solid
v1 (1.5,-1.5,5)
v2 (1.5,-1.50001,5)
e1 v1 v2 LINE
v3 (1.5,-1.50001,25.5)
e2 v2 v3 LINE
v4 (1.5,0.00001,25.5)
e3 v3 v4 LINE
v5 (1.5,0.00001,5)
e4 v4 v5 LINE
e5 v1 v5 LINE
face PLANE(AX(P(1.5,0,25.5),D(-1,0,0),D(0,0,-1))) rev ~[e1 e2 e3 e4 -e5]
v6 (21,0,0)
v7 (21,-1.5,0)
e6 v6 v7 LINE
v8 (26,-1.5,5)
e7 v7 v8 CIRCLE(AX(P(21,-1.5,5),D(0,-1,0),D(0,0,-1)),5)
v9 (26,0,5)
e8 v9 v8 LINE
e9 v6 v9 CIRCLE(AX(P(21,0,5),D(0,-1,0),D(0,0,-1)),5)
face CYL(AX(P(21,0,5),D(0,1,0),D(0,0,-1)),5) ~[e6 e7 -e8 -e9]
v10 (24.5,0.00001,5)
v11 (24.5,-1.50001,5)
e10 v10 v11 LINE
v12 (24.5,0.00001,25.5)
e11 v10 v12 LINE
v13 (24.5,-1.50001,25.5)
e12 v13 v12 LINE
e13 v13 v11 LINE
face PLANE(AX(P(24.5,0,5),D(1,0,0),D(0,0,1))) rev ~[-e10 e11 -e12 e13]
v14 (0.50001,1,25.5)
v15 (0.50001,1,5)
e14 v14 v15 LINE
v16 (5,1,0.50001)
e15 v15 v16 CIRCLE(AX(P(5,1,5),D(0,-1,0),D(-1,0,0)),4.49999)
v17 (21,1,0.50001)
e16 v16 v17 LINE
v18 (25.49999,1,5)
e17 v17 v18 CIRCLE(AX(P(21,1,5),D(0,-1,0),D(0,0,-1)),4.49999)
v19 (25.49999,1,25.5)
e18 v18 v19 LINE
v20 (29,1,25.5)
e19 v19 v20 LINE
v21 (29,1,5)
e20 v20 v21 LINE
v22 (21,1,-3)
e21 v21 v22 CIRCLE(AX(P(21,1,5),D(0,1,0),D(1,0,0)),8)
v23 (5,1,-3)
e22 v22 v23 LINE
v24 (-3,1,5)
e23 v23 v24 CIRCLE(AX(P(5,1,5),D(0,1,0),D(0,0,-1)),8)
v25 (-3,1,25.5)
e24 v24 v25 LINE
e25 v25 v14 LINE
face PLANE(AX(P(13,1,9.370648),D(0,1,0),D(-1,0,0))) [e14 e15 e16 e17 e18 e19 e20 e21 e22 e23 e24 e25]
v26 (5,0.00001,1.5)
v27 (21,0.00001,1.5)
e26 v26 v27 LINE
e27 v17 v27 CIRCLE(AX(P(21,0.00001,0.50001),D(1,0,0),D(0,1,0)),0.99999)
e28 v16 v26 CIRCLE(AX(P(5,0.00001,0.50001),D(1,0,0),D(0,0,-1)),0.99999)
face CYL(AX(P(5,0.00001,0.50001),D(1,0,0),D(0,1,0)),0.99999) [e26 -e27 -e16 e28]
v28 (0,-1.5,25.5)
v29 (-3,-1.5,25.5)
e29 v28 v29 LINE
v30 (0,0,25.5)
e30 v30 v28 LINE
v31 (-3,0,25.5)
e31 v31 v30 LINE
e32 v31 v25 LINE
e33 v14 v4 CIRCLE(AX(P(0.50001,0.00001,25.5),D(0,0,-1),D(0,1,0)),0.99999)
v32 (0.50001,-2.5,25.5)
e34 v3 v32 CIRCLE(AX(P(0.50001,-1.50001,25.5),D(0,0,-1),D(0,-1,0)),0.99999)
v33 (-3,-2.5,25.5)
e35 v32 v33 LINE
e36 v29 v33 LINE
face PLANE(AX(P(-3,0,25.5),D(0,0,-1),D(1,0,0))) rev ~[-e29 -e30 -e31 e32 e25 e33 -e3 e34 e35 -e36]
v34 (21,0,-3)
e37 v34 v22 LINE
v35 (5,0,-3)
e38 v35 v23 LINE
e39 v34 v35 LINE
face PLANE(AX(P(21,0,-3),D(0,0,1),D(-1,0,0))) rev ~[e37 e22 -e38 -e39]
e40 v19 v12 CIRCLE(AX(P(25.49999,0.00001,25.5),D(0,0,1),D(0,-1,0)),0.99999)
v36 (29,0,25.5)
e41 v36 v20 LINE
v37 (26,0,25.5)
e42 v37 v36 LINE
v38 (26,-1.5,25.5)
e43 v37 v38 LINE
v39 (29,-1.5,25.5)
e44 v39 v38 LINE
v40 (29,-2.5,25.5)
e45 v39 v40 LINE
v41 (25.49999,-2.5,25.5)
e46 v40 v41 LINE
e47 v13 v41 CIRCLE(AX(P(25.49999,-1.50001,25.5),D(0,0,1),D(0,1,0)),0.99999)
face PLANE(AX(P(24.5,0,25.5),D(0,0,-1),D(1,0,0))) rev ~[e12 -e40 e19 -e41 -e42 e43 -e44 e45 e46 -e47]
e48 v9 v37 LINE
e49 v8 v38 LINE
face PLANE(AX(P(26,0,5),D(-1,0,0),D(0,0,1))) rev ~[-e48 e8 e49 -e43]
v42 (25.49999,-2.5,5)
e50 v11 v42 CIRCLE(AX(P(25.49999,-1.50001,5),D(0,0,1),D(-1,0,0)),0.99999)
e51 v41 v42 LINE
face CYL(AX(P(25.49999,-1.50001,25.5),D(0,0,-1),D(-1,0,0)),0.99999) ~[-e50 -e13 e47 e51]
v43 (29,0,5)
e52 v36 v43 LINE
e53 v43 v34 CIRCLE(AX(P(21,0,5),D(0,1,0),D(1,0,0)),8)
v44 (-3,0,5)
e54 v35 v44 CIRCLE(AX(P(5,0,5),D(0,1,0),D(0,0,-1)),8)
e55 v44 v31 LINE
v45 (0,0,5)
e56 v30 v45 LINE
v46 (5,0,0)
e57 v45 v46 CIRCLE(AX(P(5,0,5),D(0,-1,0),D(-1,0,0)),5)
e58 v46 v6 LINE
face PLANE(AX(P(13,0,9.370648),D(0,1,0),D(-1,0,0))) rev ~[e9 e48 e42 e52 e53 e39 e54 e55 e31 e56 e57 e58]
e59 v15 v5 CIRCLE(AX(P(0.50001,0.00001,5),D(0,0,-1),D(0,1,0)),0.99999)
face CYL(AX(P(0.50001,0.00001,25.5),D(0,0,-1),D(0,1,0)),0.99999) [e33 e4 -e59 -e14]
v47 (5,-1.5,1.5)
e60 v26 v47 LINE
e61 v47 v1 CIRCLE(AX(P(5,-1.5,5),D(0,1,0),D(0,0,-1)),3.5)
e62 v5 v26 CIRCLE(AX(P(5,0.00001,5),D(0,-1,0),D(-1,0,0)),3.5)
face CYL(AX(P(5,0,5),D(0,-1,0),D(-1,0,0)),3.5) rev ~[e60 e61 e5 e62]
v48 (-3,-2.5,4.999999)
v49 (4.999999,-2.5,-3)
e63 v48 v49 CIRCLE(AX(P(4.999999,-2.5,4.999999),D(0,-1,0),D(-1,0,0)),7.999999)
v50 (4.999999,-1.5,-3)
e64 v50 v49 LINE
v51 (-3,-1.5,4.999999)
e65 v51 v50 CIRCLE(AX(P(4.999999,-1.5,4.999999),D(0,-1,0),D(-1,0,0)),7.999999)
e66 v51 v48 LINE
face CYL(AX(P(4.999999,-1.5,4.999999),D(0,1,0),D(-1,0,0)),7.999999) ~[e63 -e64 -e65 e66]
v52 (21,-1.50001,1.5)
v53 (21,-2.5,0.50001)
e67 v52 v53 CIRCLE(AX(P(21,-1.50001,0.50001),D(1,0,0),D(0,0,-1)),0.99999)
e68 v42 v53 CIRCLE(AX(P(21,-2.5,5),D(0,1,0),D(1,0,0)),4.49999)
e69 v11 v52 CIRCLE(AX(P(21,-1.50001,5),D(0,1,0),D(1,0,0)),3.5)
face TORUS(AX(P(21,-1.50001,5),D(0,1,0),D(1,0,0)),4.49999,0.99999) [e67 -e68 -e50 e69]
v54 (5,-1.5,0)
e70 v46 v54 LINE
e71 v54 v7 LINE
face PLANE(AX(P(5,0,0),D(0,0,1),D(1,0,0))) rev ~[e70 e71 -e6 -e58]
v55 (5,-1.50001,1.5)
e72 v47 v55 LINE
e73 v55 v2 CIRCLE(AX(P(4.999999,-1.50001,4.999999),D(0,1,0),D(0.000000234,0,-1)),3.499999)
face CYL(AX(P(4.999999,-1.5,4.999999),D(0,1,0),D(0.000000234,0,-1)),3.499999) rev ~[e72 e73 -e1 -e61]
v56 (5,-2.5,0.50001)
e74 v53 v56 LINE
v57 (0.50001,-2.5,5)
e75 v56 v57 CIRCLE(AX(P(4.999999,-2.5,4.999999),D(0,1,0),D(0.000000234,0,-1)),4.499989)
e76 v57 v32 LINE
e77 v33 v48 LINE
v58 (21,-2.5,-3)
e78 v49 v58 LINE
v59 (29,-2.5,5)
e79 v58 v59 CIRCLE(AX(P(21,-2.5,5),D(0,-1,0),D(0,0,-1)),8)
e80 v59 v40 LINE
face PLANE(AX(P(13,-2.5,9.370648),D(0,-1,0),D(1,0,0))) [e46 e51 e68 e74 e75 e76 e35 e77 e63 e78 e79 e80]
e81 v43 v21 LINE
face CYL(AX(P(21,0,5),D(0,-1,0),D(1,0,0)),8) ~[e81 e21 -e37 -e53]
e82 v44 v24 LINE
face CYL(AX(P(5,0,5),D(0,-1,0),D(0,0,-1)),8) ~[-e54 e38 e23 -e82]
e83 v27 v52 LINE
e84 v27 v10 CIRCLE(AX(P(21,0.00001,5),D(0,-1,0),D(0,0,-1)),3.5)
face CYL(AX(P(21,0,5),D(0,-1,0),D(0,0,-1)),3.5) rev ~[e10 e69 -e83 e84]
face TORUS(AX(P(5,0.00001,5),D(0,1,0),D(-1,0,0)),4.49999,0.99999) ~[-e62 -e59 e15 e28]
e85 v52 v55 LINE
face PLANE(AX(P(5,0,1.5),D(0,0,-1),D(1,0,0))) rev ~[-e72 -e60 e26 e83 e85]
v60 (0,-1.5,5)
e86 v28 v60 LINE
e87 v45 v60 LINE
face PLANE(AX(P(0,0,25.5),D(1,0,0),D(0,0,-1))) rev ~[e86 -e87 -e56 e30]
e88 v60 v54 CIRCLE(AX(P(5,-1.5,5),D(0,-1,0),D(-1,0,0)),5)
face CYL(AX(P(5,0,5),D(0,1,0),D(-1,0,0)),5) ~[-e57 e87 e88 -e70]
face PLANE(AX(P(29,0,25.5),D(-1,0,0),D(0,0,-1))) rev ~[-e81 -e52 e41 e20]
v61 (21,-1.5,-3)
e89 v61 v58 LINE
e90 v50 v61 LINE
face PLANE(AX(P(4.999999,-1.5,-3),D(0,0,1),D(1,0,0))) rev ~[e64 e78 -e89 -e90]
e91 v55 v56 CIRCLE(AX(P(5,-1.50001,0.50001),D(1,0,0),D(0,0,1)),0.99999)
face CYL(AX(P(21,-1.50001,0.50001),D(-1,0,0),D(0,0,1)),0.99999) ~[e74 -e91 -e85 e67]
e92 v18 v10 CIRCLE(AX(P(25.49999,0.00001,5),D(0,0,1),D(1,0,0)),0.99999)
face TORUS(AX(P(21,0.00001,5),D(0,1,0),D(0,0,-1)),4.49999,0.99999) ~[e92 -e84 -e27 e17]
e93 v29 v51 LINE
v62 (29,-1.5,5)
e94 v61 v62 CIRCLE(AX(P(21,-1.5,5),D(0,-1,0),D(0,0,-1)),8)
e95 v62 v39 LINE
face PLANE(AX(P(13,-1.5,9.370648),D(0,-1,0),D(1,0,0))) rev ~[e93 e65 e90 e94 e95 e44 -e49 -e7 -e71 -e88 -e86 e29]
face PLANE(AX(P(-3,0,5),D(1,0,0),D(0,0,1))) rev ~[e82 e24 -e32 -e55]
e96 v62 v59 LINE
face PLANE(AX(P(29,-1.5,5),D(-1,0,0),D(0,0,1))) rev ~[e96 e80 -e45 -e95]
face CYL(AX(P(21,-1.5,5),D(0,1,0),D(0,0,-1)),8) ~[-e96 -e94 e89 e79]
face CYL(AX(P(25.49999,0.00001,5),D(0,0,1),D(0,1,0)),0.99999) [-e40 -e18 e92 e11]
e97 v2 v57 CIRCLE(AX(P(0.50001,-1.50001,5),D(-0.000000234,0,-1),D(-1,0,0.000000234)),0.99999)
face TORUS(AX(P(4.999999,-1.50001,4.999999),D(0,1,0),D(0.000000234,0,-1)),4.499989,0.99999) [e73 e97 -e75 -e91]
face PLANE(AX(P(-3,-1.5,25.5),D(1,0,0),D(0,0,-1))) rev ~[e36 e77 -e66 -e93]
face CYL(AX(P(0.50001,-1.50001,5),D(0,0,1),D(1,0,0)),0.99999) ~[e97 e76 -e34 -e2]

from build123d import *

# Parameters (mm, degrees)
F1_DEPTH = 1.5
F3_DEPTH = 1
F5_DEPTH = 1
F6_R     = 0.99999


# Not quite as in the source:
# - a fillet or chamfer is up to 0.001 mm smaller than in the source, because OpenCascade refuses the exact size
# - ends of sketch curves that miss each other by under 0.0002 mm in the source are joined


with BuildPart() as f1:
    # F0 (on Front) → F1 (new body)
    with BuildSketch(Plane.XZ):
        with BuildLine():
            Line((1.5, 25.5), (0, 25.5))
            Line((0, 25.5), (0, 5))
            ThreePointArc((0, 5), (1.4644660941, 1.4644660941), (5, 0))
            Line((5, 0), (21, 0))
            ThreePointArc((21, 0), (24.5355339059, 1.4644660941), (26, 5))
            Line((26, 5), (26, 25.5))
            Line((26, 25.5), (24.5, 25.5))
            Line((24.5, 25.5), (24.5, 5))
            ThreePointArc((24.5, 5), (23.4748737342, 2.5251262658), (21, 1.5))
            Line((21, 1.5), (5, 1.5))
            ThreePointArc((5, 1.5), (2.5251262658, 2.5251262658), (1.5, 5))
            Line((1.5, 5), (1.5, 25.5))
        make_face()
    extrude(amount=F1_DEPTH)

    # F2 (on face) → F3 (join)
    with BuildSketch(Plane.XZ.offset(1.5)):
        with BuildLine():
            Line((1.5, 5), (1.5, 25.5))
            Line((1.5, 25.5), (-3, 25.5))
            Line((-3, 25.5), (-3, 4.9999991806))
            ThreePointArc((-3, 4.9999991806), (-0.6568544895, -0.6568544895), (4.9999991806, -3))
            Line((4.9999991806, -3), (21, -3))
            ThreePointArc((21, -3), (26.6568542495, -0.6568542495), (29, 5))
            Line((29, 5), (29, 25.5))
            Line((29, 25.5), (24.5, 25.5))
            Line((24.5, 25.5), (24.5, 5))
            ThreePointArc((24.5, 5), (23.4748737342, 2.5251262658), (21, 1.5))
            Line((21, 1.5), (5, 1.5))
            ThreePointArc((5, 1.5), (2.5251257362, 2.5251263156), (1.5, 5))
        make_face()
    extrude(amount=F3_DEPTH)

    # F4 (on face) → F5 (join)
    with BuildSketch(Plane(origin=(0, 0, 0), x_dir=(-1, 0, 0), z_dir=(0, 1, 0))):
        with BuildLine():
            Line((-24.5, 5), (-24.5, 25.5))
            Line((-24.5, 25.5), (-29, 25.5))
            Line((-29, 25.5), (-29, 5))
            ThreePointArc((-29, 5), (-26.6568542495, -0.6568542495), (-21, -3))
            Line((-21, -3), (-5, -3))
            ThreePointArc((-5, -3), (0.6568542495, -0.6568542495), (3, 5))
            Line((3, 5), (3, 25.5))
            Line((3, 25.5), (-1.5, 25.5))
            Line((-1.5, 25.5), (-1.5, 5))
            ThreePointArc((-1.5, 5), (-2.5251262658, 2.5251262658), (-5, 1.5))
            Line((-5, 1.5), (-21, 1.5))
            ThreePointArc((-21, 1.5), (-23.4748737342, 2.5251262658), (-24.5, 5))
        make_face()
    extrude(amount=F5_DEPTH)

    # F6 (radius 1 in the source; OpenCascade refuses exactly that, so slightly less here)
    f6_edges = [f1.edges().sort_by_distance(p)[0] for p in [
        (23.474874, 1, 2.525126),
        (24.5, -2.5, 15.25),
    ]]
    fillet(f6_edges, radius=F6_R)


solid = f1.part
